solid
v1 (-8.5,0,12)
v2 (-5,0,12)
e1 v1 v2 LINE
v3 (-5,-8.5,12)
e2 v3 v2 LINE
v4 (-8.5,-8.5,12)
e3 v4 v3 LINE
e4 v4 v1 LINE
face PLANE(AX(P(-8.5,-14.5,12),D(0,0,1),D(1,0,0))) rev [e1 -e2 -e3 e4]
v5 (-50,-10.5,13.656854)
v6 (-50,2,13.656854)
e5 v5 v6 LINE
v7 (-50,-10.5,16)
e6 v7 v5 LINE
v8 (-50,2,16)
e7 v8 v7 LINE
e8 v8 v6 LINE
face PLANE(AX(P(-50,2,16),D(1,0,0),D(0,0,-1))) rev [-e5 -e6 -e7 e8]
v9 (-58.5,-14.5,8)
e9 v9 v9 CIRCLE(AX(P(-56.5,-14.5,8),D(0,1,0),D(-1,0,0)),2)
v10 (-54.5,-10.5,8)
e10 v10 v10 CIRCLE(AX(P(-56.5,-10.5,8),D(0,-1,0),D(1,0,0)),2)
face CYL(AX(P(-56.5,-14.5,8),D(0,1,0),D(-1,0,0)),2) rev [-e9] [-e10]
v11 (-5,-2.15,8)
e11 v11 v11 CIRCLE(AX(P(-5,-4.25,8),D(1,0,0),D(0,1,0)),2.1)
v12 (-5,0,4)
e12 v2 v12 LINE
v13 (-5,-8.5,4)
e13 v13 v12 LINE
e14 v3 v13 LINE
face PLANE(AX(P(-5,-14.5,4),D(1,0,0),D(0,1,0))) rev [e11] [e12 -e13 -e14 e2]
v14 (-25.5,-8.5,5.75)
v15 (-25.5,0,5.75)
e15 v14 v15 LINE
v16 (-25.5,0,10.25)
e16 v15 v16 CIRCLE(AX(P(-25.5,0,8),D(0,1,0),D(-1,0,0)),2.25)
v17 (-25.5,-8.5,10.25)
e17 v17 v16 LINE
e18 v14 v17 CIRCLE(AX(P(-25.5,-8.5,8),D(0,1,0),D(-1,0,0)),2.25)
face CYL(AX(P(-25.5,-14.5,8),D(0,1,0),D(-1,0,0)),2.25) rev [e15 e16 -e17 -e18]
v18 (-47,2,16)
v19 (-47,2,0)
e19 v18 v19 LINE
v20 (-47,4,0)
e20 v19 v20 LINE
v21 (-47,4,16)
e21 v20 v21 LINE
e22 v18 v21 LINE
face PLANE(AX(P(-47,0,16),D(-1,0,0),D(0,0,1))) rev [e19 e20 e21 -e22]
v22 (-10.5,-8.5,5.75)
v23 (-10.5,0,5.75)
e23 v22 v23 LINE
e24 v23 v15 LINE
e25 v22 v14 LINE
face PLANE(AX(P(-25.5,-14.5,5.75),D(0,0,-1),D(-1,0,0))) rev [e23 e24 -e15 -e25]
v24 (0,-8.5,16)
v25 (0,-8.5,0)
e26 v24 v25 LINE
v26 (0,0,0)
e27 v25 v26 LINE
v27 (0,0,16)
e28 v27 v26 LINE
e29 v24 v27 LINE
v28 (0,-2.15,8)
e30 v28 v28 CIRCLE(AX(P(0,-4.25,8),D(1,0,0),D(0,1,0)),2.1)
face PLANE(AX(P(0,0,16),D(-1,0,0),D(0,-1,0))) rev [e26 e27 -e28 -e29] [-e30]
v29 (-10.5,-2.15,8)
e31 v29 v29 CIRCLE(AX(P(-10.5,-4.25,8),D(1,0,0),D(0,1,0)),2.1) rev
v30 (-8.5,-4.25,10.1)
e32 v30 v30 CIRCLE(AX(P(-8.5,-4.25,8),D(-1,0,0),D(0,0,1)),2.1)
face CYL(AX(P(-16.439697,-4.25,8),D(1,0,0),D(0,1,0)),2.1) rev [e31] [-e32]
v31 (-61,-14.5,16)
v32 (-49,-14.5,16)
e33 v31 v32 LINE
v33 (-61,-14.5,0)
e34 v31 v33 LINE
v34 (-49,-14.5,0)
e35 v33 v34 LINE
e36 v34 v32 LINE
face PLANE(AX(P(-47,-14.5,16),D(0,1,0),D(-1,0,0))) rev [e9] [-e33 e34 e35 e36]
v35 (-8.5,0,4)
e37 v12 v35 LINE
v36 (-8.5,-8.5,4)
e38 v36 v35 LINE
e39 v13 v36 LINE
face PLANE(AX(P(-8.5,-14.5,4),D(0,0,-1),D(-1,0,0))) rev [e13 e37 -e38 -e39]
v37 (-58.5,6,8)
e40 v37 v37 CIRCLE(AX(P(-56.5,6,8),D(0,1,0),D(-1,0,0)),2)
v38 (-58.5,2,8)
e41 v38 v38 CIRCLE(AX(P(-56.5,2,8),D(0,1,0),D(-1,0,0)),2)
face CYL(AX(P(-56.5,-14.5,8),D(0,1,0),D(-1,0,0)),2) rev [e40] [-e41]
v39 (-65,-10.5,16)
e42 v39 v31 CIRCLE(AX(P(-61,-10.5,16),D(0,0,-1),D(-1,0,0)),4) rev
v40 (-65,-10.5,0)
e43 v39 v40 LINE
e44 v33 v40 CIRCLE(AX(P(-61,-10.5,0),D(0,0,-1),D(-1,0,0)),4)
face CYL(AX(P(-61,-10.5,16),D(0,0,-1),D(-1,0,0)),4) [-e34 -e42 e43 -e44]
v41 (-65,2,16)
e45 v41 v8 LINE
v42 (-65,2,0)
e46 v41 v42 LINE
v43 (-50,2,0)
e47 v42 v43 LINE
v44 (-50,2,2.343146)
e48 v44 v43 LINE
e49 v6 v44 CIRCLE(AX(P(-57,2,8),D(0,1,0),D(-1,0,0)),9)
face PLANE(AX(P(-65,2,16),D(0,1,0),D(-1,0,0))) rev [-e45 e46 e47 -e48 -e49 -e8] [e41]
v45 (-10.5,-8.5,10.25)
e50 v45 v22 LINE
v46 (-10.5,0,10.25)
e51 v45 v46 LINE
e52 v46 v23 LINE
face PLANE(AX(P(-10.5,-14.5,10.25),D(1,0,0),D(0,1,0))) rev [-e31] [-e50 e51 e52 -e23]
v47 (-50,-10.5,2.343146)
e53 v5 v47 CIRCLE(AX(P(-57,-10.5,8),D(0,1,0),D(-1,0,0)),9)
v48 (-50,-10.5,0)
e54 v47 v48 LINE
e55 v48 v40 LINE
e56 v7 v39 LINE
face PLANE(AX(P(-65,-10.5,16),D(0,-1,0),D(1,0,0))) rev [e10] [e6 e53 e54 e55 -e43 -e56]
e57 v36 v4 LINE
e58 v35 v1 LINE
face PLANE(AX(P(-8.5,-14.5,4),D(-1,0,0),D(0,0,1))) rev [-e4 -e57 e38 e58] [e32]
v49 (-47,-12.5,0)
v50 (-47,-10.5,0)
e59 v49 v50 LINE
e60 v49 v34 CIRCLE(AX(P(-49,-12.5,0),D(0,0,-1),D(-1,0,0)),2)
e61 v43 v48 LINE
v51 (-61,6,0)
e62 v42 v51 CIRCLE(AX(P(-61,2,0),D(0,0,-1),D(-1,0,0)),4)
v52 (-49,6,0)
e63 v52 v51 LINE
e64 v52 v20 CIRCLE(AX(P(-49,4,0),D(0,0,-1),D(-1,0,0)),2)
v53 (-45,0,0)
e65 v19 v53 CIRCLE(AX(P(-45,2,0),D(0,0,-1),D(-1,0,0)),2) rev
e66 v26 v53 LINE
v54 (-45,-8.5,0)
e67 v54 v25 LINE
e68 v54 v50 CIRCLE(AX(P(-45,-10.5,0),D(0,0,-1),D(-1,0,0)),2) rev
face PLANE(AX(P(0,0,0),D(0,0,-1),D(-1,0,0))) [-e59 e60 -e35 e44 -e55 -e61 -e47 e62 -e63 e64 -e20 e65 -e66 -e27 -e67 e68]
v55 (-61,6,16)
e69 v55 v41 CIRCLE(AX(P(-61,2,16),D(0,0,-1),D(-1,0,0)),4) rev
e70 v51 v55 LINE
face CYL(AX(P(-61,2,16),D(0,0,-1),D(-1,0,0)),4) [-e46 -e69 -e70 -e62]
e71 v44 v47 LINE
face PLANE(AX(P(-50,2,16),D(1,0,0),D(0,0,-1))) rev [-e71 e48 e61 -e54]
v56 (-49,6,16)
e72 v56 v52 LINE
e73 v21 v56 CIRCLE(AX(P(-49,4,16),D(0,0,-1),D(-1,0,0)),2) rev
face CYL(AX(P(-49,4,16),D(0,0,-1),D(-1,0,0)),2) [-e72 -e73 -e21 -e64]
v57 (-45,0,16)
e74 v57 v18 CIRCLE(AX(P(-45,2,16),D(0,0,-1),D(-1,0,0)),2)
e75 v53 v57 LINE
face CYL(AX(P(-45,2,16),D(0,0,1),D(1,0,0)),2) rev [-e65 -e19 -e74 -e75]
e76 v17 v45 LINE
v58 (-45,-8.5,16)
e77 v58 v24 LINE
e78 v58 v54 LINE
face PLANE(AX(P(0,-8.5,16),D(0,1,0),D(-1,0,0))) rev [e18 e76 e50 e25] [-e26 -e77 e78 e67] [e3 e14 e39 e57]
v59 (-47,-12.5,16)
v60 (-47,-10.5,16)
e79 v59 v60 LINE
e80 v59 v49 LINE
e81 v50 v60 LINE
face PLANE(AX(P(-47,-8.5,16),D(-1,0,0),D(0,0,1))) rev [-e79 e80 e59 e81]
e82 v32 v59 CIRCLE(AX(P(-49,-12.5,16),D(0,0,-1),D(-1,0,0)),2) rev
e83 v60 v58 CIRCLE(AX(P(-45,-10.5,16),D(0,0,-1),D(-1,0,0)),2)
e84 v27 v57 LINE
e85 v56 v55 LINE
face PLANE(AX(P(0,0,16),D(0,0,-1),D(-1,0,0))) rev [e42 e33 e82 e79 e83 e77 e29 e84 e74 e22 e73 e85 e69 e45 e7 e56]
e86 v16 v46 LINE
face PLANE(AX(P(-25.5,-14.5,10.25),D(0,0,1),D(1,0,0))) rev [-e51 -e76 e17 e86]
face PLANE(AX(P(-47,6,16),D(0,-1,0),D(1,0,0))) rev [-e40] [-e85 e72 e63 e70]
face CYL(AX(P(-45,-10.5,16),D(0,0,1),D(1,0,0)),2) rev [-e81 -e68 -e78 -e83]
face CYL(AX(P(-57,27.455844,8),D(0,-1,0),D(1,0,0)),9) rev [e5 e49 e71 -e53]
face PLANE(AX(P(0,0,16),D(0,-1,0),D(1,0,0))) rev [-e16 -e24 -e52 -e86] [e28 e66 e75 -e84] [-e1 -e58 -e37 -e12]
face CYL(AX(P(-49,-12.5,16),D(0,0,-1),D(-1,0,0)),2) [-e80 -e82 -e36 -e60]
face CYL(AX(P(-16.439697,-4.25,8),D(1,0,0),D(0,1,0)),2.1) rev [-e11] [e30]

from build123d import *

# Parameters (mm, degrees)
BOSS_EXTRUDE1_DEPTH = 16
SKETCH2_W           = 3.5
SKETCH2_H           = 8
CUT_EXTRUDE1_DEPTH  = 69.492700341
CUT_EXTRUDE2_REACH  = 70.493
SKETCH3_R           = 2.1
FILLET1_R           = 2
SKETCH4_R           = 9
CUT_EXTRUDE3_DEPTH  = 12.5
SKETCH5_R           = 2
CUT_EXTRUDE4_DEPTH  = 71.008928002
FILLET2_R           = 4


with BuildPart() as part:
    # Sketch1 → Boss-Extrude1 (new body)
    with BuildSketch(Plane.XY):
        Polygon((0, 0), (-47, 0), (-47, 6), (-65, 6), (-65, 2), (-50, 2), (-50, -10.5), (-65, -10.5), (-65, -14.5), (-47, -14.5), (-47, -8.5), (0, -8.5), align=None)
    extrude(amount=BOSS_EXTRUDE1_DEPTH)

    # Sketch2 → Cut-Extrude1 (cut, through all)
    with BuildSketch(Plane(origin=(0, 0, 0), x_dir=(1, 0, 0), z_dir=(0, 1, 0))):
        with Locations((-6.75, -8)):
            Rectangle(SKETCH2_W, SKETCH2_H)
        with BuildLine():
            Line((-25.5, -10.25), (-10.5, -10.25))
            Line((-10.5, -10.25), (-10.5, -5.75))
            Line((-10.5, -5.75), (-25.5, -5.75))
            ThreePointArc((-25.5, -5.75), (-27.750000403, -8), (-25.5, -10.25))
        make_face()
    extrude(amount=-CUT_EXTRUDE1_DEPTH, mode=Mode.SUBTRACT)

    # Cut-Extrude2: up to this face of the body (flat: up to its plane)
    cut_extrude2_end = Plane(part.part.faces().sort_by_distance((-10.5, -4.25, 8))[0])
    # Sketch3 → Cut-Extrude2 (cut, up to the picked face)
    with BuildSketch(Plane(origin=(0, 0, 0), x_dir=(0, 0, -1), z_dir=(1, 0, 0)), mode=Mode.PRIVATE) as cut_extrude2_sk1:
        with Locations(Location((-8, -4.25, 0), (0, 0, 90))):
            Circle(SKETCH3_R)
    cut_extrude2_tool1 = split(extrude(cut_extrude2_sk1.sketch, amount=-CUT_EXTRUDE2_REACH, mode=Mode.PRIVATE), bisect_by=cut_extrude2_end, keep=Keep.BOTH, mode=Mode.PRIVATE)
    add(cut_extrude2_tool1.solids().sort_by(Axis((0, -4.25, 8), (-1, 0, 0)))[0], mode=Mode.SUBTRACT)

    # Fillet1
    fillet1_edges = [part.edges().sort_by_distance(p)[0] for p in [
        (-47, -8.5, 8),
        (-47, -14.5, 8),
        (-47, 6, 8),
        (-47, 0, 8),
    ]]
    fillet(fillet1_edges, radius=FILLET1_R)

    # Sketch4 → Cut-Extrude3 (cut)
    with BuildSketch(Plane(origin=(0, -10.5, 0), x_dir=(1, 0, 0), z_dir=(0, 1, 0))):
        with Locations((-57, -8)):
            Circle(SKETCH4_R)
    extrude(amount=CUT_EXTRUDE3_DEPTH, mode=Mode.SUBTRACT)

    # Sketch5 → Cut-Extrude4 (cut, through all)
    with BuildSketch(Plane(origin=(0, 6, 0), x_dir=(1, 0, 0), z_dir=(0, 1, 0))):
        with Locations(Location((-56.5, -8, 0), (0, 0, 180))):
            Circle(SKETCH5_R)
    extrude(amount=-CUT_EXTRUDE4_DEPTH, mode=Mode.SUBTRACT)

    # Fillet2
    fillet2_edges = [part.edges().sort_by_distance(p)[0] for p in [
        (-65, -14.5, 8),
        (-65, 6, 8),
    ]]
    fillet(fillet2_edges, radius=FILLET2_R - 0.0001)  # a hair under: the kernel refuses the full size


solid = part.part
